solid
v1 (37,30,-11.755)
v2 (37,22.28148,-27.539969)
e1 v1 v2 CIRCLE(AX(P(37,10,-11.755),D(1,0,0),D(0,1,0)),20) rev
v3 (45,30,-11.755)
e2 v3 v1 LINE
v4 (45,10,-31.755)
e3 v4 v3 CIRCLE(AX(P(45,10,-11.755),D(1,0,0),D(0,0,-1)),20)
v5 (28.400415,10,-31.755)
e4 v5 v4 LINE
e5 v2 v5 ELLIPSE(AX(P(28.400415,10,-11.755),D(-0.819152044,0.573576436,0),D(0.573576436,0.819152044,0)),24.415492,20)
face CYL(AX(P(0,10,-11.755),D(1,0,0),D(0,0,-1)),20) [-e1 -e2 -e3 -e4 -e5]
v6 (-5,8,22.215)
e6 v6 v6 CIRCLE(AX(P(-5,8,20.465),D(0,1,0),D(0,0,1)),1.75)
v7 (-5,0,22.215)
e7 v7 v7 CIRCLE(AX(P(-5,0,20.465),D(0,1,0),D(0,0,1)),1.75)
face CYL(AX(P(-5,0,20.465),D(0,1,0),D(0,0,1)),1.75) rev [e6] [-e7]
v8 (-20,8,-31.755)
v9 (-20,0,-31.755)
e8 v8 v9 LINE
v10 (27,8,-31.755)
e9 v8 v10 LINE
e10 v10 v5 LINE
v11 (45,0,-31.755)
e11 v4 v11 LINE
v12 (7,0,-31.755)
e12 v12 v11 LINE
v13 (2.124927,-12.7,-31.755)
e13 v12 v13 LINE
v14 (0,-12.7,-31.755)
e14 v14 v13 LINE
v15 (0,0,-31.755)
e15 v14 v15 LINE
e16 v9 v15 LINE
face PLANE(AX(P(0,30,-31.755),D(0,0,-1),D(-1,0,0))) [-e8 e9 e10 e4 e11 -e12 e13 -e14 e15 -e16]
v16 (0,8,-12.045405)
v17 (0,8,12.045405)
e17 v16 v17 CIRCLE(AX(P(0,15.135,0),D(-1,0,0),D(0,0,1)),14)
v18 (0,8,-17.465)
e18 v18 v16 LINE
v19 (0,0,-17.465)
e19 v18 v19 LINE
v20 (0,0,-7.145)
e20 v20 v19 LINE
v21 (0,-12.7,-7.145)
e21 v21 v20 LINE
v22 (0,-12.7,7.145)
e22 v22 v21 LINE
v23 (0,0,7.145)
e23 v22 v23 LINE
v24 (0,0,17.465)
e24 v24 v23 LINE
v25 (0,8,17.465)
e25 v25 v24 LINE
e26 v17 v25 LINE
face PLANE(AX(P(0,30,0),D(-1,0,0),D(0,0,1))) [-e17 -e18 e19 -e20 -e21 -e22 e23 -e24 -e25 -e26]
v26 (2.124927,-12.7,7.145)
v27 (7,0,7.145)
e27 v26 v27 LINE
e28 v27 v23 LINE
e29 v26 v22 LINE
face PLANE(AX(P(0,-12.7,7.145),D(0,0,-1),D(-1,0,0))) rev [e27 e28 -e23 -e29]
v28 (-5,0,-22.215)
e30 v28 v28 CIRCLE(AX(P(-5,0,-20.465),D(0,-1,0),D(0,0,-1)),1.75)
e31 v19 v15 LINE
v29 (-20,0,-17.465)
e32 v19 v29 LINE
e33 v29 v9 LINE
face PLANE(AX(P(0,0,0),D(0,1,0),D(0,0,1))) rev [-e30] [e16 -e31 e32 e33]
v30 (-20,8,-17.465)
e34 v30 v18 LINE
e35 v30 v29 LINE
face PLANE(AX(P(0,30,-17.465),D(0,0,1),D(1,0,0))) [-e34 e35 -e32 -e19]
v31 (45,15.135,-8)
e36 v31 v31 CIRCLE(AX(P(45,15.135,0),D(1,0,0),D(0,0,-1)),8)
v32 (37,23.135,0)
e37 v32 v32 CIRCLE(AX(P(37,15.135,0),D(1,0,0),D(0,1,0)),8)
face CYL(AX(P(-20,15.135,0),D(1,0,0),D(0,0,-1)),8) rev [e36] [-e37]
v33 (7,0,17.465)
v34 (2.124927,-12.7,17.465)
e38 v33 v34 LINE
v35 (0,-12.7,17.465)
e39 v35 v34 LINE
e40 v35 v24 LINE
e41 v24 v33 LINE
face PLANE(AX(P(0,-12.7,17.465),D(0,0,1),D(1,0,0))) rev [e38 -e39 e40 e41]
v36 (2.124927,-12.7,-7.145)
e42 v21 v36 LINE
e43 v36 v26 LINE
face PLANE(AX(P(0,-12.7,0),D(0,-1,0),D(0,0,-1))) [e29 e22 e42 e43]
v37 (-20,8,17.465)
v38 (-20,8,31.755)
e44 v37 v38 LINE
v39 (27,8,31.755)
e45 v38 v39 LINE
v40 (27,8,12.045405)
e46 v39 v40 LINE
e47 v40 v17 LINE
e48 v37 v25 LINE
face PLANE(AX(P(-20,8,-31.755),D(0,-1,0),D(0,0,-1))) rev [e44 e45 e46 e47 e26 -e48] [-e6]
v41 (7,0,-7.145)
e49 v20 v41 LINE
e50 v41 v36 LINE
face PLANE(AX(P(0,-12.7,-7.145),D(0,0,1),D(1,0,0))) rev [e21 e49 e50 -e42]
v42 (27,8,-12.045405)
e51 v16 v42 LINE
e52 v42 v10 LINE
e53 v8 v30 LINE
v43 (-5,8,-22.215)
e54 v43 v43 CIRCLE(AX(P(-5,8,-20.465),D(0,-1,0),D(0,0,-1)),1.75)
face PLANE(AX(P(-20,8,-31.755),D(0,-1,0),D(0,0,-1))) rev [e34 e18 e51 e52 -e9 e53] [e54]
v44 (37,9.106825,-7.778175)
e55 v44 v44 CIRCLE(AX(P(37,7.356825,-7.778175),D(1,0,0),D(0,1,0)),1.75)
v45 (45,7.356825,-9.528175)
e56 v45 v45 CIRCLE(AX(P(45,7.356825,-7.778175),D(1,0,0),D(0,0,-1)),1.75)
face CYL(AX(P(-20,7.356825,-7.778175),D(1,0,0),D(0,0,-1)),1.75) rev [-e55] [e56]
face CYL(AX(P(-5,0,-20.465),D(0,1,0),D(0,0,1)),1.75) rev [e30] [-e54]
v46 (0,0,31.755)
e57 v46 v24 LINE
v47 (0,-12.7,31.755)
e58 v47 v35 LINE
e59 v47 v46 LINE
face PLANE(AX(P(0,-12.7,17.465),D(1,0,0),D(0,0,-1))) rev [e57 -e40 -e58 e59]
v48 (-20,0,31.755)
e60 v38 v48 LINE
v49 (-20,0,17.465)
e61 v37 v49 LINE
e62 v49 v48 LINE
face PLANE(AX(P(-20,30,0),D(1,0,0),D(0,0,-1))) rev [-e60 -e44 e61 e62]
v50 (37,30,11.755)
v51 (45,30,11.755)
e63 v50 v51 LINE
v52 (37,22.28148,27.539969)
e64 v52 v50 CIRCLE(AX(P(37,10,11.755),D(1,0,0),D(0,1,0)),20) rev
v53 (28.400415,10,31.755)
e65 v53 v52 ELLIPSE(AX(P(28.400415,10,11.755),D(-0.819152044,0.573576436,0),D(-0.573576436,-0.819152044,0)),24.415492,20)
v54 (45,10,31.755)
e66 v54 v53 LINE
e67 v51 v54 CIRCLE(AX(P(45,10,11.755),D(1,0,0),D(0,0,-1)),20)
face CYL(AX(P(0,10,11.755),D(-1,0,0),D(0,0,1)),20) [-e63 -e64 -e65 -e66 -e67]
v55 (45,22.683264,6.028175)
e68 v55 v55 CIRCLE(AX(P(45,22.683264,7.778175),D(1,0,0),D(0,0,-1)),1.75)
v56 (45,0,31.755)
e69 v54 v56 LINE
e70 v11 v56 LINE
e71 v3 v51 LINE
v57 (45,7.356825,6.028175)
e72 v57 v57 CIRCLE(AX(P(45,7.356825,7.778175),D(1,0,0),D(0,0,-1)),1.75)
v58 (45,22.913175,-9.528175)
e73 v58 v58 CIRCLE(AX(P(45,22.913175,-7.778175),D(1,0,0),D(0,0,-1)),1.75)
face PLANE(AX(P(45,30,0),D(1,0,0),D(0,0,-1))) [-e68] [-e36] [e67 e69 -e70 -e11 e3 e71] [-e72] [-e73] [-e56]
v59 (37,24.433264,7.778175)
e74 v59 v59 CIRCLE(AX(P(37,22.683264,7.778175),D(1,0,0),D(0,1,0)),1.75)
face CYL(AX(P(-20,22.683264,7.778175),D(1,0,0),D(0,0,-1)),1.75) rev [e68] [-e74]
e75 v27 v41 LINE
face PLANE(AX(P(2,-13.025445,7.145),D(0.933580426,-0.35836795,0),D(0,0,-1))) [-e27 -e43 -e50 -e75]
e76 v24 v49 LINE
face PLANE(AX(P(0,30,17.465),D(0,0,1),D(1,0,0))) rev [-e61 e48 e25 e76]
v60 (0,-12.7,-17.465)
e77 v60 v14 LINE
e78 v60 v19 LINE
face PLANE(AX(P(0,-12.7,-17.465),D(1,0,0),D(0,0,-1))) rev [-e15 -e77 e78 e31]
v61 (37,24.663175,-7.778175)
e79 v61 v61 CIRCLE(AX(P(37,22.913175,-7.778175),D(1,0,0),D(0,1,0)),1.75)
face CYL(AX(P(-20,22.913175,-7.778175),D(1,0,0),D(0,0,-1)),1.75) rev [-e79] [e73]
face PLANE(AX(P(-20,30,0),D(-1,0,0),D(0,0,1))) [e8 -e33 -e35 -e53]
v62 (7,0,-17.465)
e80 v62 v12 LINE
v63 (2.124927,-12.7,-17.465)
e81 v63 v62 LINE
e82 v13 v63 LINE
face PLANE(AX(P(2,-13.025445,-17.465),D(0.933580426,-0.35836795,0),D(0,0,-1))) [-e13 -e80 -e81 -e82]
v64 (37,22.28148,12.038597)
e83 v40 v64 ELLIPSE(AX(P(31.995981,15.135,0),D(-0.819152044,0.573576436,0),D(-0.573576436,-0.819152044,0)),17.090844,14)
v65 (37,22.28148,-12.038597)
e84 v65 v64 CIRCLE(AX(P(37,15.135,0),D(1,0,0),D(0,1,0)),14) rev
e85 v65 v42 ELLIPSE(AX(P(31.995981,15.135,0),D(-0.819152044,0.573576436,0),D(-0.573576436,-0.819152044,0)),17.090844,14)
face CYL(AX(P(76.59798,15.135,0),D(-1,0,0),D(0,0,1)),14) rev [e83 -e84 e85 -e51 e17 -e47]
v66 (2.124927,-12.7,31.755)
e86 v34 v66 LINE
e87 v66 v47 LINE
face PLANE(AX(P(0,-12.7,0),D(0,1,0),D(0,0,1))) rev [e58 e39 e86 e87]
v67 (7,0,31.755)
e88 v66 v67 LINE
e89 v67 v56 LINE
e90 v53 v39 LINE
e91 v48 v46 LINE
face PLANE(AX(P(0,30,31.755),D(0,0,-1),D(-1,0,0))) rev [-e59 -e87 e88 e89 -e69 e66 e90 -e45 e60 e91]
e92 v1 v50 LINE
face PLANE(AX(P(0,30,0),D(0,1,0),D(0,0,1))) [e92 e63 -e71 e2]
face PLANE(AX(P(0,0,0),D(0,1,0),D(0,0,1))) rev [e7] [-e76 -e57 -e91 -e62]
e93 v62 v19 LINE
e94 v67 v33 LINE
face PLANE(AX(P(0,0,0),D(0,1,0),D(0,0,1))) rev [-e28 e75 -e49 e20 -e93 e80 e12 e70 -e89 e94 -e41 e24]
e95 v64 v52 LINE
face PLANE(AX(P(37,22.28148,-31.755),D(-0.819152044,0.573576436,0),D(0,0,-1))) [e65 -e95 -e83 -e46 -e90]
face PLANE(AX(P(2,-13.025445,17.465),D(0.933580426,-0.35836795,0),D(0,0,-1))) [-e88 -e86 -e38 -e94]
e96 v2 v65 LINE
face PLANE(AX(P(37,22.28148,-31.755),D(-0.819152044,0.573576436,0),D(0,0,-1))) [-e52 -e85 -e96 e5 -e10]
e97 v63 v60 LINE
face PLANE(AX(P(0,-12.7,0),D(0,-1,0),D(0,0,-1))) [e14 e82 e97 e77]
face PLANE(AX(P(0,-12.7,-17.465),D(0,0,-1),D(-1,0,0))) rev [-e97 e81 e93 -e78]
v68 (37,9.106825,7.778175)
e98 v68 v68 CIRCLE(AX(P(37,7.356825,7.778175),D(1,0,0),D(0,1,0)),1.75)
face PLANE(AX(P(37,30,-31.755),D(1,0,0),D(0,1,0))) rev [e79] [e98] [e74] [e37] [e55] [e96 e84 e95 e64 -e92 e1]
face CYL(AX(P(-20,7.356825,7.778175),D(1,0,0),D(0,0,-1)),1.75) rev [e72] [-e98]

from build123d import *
from OCP.BRepFilletAPI import BRepFilletAPI_MakeChamfer

# Parameters (mm, degrees)
BOSS_EXTRUDE1_DEPTH = 30
SKETCH2_W           = 57
SKETCH2_H           = 22
CUT_EXTRUDE1_DEPTH  = 84.417744515
SKETCH4_R           = 8
SKETCH4_R_2         = 1.75
CUT_EXTRUDE2_DEPTH  = 79.315898929
SKETCH5_R           = 14
CUT_EXTRUDE3_DEPTH  = 37
SKETCH6_R           = 1.75
CUT_EXTRUDE4_DEPTH  = 60.307503952
CHAMFER1_SIZE       = 10
CHAMFER1_SIZE2      = 14.281480067
FILLET3_R           = 20
SKETCH11_W          = 2
SKETCH11_H          = 14.29
BOSS_EXTRUDE3_DEPTH = 12.7
CHAMFER2_SIZE       = 5
CHAMFER2_SIZE_2     = 13.025445323


with BuildPart() as part:
    # Sketch1 → Boss-Extrude1 (new body)
    with BuildSketch(Plane(origin=(0, 0, 0), x_dir=(1, 0, 0), z_dir=(0, 1, 0))):
        Polygon((0, 0), (0, -17.465), (-20, -17.465), (-20, -31.755), (45, -31.755), (45, 0), align=None)
        Polygon((0, 17.465), (0, 0), (45, 0), (45, 31.755), (-20, 31.755), (-20, 17.465), align=None)
    extrude(amount=BOSS_EXTRUDE1_DEPTH)

    # Sketch2 → Cut-Extrude1 (cut, through all)
    with BuildSketch(Plane.XY.offset(31.755)):
        with Locations((8.5, 19)):
            Rectangle(SKETCH2_W, SKETCH2_H)
    extrude(amount=-CUT_EXTRUDE1_DEPTH, mode=Mode.SUBTRACT)

    # Sketch4 → Cut-Extrude2 (cut, through all)
    with BuildSketch(Plane(origin=(45, 0, 0), x_dir=(0, 0, -1), z_dir=(1, 0, 0))):
        with Locations((0, 15.135)):
            Circle(SKETCH4_R)
        with Locations((-7.778174593, 22.683263808)):
            Circle(SKETCH4_R_2)
        with Locations((7.778174593, 22.913174593)):
            Circle(SKETCH4_R_2)
        with Locations((7.778174593, 7.356825407)):
            Circle(SKETCH4_R_2)
        with Locations((-7.778174593, 7.356825407)):
            Circle(SKETCH4_R_2)
    extrude(amount=-CUT_EXTRUDE2_DEPTH, mode=Mode.SUBTRACT)

    # Sketch5 → Cut-Extrude3 (cut)
    with BuildSketch(Plane.ZY):
        with Locations((0, 15.135)):
            Circle(SKETCH5_R)
    extrude(amount=-CUT_EXTRUDE3_DEPTH, mode=Mode.SUBTRACT)

    # Sketch6 → Cut-Extrude4 (cut, through all)
    with BuildSketch(Plane(origin=(0, 8, 0), x_dir=(1, 0, 0), z_dir=(0, 1, 0))):
        with Locations(Location((-5, -20.465, 0), (0, 0, 270))):
            Circle(SKETCH6_R)
    cut_extrude4 = extrude(amount=-CUT_EXTRUDE4_DEPTH, mode=Mode.SUBTRACT)

    # Mirror1: Cut-Extrude4 across plane
    add(cut_extrude4.mirror(Plane.XY), mode=Mode.SUBTRACT)

    # Chamfer1: one chamfer whose edges measure the first distance from different faces: ONE call of the kernel's chamfer builder (chamfer() names one face for all edges)
    chamfer1_edges_1 = [part.edges().sort_by_distance(p)[0] for p in [
        (37, 8, -21.900202363),
    ]]
    chamfer1_side_1 = [part.faces().sort_by_distance(p)[0] for p in [
        (10.623596069, 8, -22.684210572),
    ]]
    chamfer1_edges_2 = [part.edges().sort_by_distance(p)[0] for p in [
        (37, 8, 21.900202363),
    ]]
    chamfer1_side_2 = [part.faces().sort_by_distance(p)[0] for p in [
        (10.623596069, 8, 22.684210572),
    ]]
    chamfer1 = BRepFilletAPI_MakeChamfer(part.part.solid().wrapped)
    for e in chamfer1_edges_1:
        chamfer1.Add(CHAMFER1_SIZE, CHAMFER1_SIZE2, e.wrapped, chamfer1_side_1[0].wrapped)  # the first distance lies on this face
    for e in chamfer1_edges_2:
        chamfer1.Add(CHAMFER1_SIZE, CHAMFER1_SIZE2, e.wrapped, chamfer1_side_2[0].wrapped)  # the first distance lies on this face
    add(Compound.cast(chamfer1.Shape()), mode=Mode.REPLACE)

    # Fillet3
    fillet3_edges = [part.edges().sort_by_distance(p)[0] for p in [
        (41, 30, -31.755),
        (41, 30, 31.755),
    ]]
    fillet(fillet3_edges, radius=FILLET3_R)

    # Sketch11 → Boss-Extrude3 (add)
    with BuildSketch(Plane.XZ):
        with Locations((1, 24.61)):
            Rectangle(SKETCH11_W, SKETCH11_H)
        with Locations((1, -24.61)):
            Rectangle(SKETCH11_W, SKETCH11_H)
        with Locations((1, 0)):
            Rectangle(SKETCH11_W, SKETCH11_H)
    extrude(amount=BOSS_EXTRUDE3_DEPTH)

    # Chamfer2
    # the kernel refuses this chamfer: 13.025445323, 5 mm, written as the material it adds along each edge
    with BuildSketch(Plane(origin=(2, 0, -16.317868448), x_dir=(0.9956314177255227, 0.0933706594057566, 0), z_dir=(0, 0, 1))) as chamfer2_piece_1_section:
        Polygon((CHAMFER2_SIZE * 0.995631417726, -CHAMFER2_SIZE * 0.0933706594058), (-CHAMFER2_SIZE_2 * 0.0933706594091, -CHAMFER2_SIZE_2 * 0.995631417761), (0, 0), align=None)
    chamfer2_piece_1 = extrude(amount=48.072868448, mode=Mode.PRIVATE)
    chamfer2_piece_1 = split(chamfer2_piece_1, bisect_by=Plane(origin=(3.561931583, -4.37126632, 7.145), z_dir=(0, 0, -1)), keep=Keep.TOP, mode=Mode.PRIVATE)
    chamfer2_piece_1 = split(chamfer2_piece_1, bisect_by=Plane(origin=(3.561931583, -4.37126632, -7.145), z_dir=(0, 0, 1)), keep=Keep.TOP, mode=Mode.PRIVATE)
    chamfer2_piece_1 = split(chamfer2_piece_1, bisect_by=Plane(origin=(3.561931583, -12.7, 0), z_dir=(0, 1, 0)), keep=Keep.TOP, mode=Mode.PRIVATE)
    add(chamfer2_piece_1)
    with BuildSketch(Plane(origin=(2, 0, 17.465), x_dir=(0.9956314177255227, 0.0933706594057566, 0), z_dir=(0, 0, 1))) as chamfer2_piece_2_section:
        Polygon((CHAMFER2_SIZE * 0.995631417726, -CHAMFER2_SIZE * 0.0933706594058), (-CHAMFER2_SIZE_2 * 0.0933706594091, -CHAMFER2_SIZE_2 * 0.995631417761), (0, 0), align=None)
    chamfer2_piece_2 = extrude(amount=14.29, mode=Mode.PRIVATE)
    chamfer2_piece_2 = split(chamfer2_piece_2, bisect_by=Plane(origin=(3.561931583, -12.7, 24.61), z_dir=(0, 1, 0)), keep=Keep.TOP, mode=Mode.PRIVATE)
    add(chamfer2_piece_2)
    with BuildSketch(Plane(origin=(2, 0, 40.927868448), x_dir=(0.9956314177255227, 0.0933706594057566, 0), z_dir=(0, 0, -1))) as chamfer2_piece_3_section:
        Polygon((CHAMFER2_SIZE * 0.995631417726, CHAMFER2_SIZE * 0.0933706594058), (-CHAMFER2_SIZE_2 * 0.0933706594091, CHAMFER2_SIZE_2 * 0.995631417761), (0, 0), align=None)
    chamfer2_piece_3 = extrude(amount=48.072868448, mode=Mode.PRIVATE)
    chamfer2_piece_3 = split(chamfer2_piece_3, bisect_by=Plane(origin=(3.561931583, -4.37126632, 31.755), z_dir=(0, 0, -1)), keep=Keep.TOP, mode=Mode.PRIVATE)
    chamfer2_piece_3 = split(chamfer2_piece_3, bisect_by=Plane(origin=(3.561931583, -12.7, 24.61), z_dir=(0, 1, 0)), keep=Keep.TOP, mode=Mode.PRIVATE)
    chamfer2_piece_3 = split(chamfer2_piece_3, bisect_by=Plane(origin=(3.561931583, -4.37126632, 17.465), z_dir=(0, 0, 1)), keep=Keep.TOP, mode=Mode.PRIVATE)
    add(chamfer2_piece_3)
    with BuildSketch(Plane(origin=(2, 0, 7.145), x_dir=(0.9956314177255227, 0.0933706594057566, 0), z_dir=(0, 0, -1))) as chamfer2_piece_4_section:
        Polygon((CHAMFER2_SIZE * 0.995631417726, CHAMFER2_SIZE * 0.0933706594058), (-CHAMFER2_SIZE_2 * 0.0933706594091, CHAMFER2_SIZE_2 * 0.995631417761), (0, 0), align=None)
    chamfer2_piece_4 = extrude(amount=14.29, mode=Mode.PRIVATE)
    chamfer2_piece_4 = split(chamfer2_piece_4, bisect_by=Plane(origin=(3.561931583, -12.7, 0), z_dir=(0, 1, 0)), keep=Keep.TOP, mode=Mode.PRIVATE)
    add(chamfer2_piece_4)
    with BuildSketch(Plane(origin=(2, 0, 7.145), x_dir=(0.9956314177255227, 0.0933706594057566, 0), z_dir=(0, 0, -1))) as chamfer2_piece_5_section:
        Polygon((CHAMFER2_SIZE * 0.995631417726, CHAMFER2_SIZE * 0.0933706594058), (-CHAMFER2_SIZE_2 * 0.0933706594091, CHAMFER2_SIZE_2 * 0.995631417761), (0, 0), align=None)
    chamfer2_piece_5 = extrude(amount=48.072868448, mode=Mode.PRIVATE)
    chamfer2_piece_5 = split(chamfer2_piece_5, bisect_by=Plane(origin=(3.561931583, -4.37126632, -31.755), z_dir=(0, 0, 1)), keep=Keep.TOP, mode=Mode.PRIVATE)
    chamfer2_piece_5 = split(chamfer2_piece_5, bisect_by=Plane(origin=(3.561931583, -12.7, -24.61), z_dir=(0, 1, 0)), keep=Keep.TOP, mode=Mode.PRIVATE)
    chamfer2_piece_5 = split(chamfer2_piece_5, bisect_by=Plane(origin=(3.561931583, -4.37126632, -17.465), z_dir=(0, 0, -1)), keep=Keep.TOP, mode=Mode.PRIVATE)
    add(chamfer2_piece_5)
    with BuildSketch(Plane(origin=(2, 0, 16.317868448), x_dir=(0.9956314177255227, 0.0933706594057566, 0), z_dir=(0, 0, -1))) as chamfer2_piece_6_section:
        Polygon((CHAMFER2_SIZE * 0.995631417726, CHAMFER2_SIZE * 0.0933706594058), (-CHAMFER2_SIZE_2 * 0.0933706594091, CHAMFER2_SIZE_2 * 0.995631417761), (0, 0), align=None)
    chamfer2_piece_6 = extrude(amount=48.072868448, mode=Mode.PRIVATE)
    chamfer2_piece_6 = split(chamfer2_piece_6, bisect_by=Plane(origin=(3.561931583, -4.37126632, 7.145), z_dir=(0, 0, -1)), keep=Keep.TOP, mode=Mode.PRIVATE)
    chamfer2_piece_6 = split(chamfer2_piece_6, bisect_by=Plane(origin=(3.561931583, -4.37126632, -7.145), z_dir=(0, 0, 1)), keep=Keep.TOP, mode=Mode.PRIVATE)
    chamfer2_piece_6 = split(chamfer2_piece_6, bisect_by=Plane(origin=(3.561931583, -12.7, 0), z_dir=(0, 1, 0)), keep=Keep.TOP, mode=Mode.PRIVATE)
    add(chamfer2_piece_6)
    with BuildSketch(Plane(origin=(2, 0, -17.465), x_dir=(0.9956314177255227, 0.0933706594057566, 0), z_dir=(0, 0, -1))) as chamfer2_piece_7_section:
        Polygon((CHAMFER2_SIZE * 0.995631417726, CHAMFER2_SIZE * 0.0933706594058), (-CHAMFER2_SIZE_2 * 0.0933706594091, CHAMFER2_SIZE_2 * 0.995631417761), (0, 0), align=None)
    chamfer2_piece_7 = extrude(amount=14.29, mode=Mode.PRIVATE)
    chamfer2_piece_7 = split(chamfer2_piece_7, bisect_by=Plane(origin=(3.561931583, -12.7, -24.61), z_dir=(0, 1, 0)), keep=Keep.TOP, mode=Mode.PRIVATE)
    add(chamfer2_piece_7)


solid = part.part
